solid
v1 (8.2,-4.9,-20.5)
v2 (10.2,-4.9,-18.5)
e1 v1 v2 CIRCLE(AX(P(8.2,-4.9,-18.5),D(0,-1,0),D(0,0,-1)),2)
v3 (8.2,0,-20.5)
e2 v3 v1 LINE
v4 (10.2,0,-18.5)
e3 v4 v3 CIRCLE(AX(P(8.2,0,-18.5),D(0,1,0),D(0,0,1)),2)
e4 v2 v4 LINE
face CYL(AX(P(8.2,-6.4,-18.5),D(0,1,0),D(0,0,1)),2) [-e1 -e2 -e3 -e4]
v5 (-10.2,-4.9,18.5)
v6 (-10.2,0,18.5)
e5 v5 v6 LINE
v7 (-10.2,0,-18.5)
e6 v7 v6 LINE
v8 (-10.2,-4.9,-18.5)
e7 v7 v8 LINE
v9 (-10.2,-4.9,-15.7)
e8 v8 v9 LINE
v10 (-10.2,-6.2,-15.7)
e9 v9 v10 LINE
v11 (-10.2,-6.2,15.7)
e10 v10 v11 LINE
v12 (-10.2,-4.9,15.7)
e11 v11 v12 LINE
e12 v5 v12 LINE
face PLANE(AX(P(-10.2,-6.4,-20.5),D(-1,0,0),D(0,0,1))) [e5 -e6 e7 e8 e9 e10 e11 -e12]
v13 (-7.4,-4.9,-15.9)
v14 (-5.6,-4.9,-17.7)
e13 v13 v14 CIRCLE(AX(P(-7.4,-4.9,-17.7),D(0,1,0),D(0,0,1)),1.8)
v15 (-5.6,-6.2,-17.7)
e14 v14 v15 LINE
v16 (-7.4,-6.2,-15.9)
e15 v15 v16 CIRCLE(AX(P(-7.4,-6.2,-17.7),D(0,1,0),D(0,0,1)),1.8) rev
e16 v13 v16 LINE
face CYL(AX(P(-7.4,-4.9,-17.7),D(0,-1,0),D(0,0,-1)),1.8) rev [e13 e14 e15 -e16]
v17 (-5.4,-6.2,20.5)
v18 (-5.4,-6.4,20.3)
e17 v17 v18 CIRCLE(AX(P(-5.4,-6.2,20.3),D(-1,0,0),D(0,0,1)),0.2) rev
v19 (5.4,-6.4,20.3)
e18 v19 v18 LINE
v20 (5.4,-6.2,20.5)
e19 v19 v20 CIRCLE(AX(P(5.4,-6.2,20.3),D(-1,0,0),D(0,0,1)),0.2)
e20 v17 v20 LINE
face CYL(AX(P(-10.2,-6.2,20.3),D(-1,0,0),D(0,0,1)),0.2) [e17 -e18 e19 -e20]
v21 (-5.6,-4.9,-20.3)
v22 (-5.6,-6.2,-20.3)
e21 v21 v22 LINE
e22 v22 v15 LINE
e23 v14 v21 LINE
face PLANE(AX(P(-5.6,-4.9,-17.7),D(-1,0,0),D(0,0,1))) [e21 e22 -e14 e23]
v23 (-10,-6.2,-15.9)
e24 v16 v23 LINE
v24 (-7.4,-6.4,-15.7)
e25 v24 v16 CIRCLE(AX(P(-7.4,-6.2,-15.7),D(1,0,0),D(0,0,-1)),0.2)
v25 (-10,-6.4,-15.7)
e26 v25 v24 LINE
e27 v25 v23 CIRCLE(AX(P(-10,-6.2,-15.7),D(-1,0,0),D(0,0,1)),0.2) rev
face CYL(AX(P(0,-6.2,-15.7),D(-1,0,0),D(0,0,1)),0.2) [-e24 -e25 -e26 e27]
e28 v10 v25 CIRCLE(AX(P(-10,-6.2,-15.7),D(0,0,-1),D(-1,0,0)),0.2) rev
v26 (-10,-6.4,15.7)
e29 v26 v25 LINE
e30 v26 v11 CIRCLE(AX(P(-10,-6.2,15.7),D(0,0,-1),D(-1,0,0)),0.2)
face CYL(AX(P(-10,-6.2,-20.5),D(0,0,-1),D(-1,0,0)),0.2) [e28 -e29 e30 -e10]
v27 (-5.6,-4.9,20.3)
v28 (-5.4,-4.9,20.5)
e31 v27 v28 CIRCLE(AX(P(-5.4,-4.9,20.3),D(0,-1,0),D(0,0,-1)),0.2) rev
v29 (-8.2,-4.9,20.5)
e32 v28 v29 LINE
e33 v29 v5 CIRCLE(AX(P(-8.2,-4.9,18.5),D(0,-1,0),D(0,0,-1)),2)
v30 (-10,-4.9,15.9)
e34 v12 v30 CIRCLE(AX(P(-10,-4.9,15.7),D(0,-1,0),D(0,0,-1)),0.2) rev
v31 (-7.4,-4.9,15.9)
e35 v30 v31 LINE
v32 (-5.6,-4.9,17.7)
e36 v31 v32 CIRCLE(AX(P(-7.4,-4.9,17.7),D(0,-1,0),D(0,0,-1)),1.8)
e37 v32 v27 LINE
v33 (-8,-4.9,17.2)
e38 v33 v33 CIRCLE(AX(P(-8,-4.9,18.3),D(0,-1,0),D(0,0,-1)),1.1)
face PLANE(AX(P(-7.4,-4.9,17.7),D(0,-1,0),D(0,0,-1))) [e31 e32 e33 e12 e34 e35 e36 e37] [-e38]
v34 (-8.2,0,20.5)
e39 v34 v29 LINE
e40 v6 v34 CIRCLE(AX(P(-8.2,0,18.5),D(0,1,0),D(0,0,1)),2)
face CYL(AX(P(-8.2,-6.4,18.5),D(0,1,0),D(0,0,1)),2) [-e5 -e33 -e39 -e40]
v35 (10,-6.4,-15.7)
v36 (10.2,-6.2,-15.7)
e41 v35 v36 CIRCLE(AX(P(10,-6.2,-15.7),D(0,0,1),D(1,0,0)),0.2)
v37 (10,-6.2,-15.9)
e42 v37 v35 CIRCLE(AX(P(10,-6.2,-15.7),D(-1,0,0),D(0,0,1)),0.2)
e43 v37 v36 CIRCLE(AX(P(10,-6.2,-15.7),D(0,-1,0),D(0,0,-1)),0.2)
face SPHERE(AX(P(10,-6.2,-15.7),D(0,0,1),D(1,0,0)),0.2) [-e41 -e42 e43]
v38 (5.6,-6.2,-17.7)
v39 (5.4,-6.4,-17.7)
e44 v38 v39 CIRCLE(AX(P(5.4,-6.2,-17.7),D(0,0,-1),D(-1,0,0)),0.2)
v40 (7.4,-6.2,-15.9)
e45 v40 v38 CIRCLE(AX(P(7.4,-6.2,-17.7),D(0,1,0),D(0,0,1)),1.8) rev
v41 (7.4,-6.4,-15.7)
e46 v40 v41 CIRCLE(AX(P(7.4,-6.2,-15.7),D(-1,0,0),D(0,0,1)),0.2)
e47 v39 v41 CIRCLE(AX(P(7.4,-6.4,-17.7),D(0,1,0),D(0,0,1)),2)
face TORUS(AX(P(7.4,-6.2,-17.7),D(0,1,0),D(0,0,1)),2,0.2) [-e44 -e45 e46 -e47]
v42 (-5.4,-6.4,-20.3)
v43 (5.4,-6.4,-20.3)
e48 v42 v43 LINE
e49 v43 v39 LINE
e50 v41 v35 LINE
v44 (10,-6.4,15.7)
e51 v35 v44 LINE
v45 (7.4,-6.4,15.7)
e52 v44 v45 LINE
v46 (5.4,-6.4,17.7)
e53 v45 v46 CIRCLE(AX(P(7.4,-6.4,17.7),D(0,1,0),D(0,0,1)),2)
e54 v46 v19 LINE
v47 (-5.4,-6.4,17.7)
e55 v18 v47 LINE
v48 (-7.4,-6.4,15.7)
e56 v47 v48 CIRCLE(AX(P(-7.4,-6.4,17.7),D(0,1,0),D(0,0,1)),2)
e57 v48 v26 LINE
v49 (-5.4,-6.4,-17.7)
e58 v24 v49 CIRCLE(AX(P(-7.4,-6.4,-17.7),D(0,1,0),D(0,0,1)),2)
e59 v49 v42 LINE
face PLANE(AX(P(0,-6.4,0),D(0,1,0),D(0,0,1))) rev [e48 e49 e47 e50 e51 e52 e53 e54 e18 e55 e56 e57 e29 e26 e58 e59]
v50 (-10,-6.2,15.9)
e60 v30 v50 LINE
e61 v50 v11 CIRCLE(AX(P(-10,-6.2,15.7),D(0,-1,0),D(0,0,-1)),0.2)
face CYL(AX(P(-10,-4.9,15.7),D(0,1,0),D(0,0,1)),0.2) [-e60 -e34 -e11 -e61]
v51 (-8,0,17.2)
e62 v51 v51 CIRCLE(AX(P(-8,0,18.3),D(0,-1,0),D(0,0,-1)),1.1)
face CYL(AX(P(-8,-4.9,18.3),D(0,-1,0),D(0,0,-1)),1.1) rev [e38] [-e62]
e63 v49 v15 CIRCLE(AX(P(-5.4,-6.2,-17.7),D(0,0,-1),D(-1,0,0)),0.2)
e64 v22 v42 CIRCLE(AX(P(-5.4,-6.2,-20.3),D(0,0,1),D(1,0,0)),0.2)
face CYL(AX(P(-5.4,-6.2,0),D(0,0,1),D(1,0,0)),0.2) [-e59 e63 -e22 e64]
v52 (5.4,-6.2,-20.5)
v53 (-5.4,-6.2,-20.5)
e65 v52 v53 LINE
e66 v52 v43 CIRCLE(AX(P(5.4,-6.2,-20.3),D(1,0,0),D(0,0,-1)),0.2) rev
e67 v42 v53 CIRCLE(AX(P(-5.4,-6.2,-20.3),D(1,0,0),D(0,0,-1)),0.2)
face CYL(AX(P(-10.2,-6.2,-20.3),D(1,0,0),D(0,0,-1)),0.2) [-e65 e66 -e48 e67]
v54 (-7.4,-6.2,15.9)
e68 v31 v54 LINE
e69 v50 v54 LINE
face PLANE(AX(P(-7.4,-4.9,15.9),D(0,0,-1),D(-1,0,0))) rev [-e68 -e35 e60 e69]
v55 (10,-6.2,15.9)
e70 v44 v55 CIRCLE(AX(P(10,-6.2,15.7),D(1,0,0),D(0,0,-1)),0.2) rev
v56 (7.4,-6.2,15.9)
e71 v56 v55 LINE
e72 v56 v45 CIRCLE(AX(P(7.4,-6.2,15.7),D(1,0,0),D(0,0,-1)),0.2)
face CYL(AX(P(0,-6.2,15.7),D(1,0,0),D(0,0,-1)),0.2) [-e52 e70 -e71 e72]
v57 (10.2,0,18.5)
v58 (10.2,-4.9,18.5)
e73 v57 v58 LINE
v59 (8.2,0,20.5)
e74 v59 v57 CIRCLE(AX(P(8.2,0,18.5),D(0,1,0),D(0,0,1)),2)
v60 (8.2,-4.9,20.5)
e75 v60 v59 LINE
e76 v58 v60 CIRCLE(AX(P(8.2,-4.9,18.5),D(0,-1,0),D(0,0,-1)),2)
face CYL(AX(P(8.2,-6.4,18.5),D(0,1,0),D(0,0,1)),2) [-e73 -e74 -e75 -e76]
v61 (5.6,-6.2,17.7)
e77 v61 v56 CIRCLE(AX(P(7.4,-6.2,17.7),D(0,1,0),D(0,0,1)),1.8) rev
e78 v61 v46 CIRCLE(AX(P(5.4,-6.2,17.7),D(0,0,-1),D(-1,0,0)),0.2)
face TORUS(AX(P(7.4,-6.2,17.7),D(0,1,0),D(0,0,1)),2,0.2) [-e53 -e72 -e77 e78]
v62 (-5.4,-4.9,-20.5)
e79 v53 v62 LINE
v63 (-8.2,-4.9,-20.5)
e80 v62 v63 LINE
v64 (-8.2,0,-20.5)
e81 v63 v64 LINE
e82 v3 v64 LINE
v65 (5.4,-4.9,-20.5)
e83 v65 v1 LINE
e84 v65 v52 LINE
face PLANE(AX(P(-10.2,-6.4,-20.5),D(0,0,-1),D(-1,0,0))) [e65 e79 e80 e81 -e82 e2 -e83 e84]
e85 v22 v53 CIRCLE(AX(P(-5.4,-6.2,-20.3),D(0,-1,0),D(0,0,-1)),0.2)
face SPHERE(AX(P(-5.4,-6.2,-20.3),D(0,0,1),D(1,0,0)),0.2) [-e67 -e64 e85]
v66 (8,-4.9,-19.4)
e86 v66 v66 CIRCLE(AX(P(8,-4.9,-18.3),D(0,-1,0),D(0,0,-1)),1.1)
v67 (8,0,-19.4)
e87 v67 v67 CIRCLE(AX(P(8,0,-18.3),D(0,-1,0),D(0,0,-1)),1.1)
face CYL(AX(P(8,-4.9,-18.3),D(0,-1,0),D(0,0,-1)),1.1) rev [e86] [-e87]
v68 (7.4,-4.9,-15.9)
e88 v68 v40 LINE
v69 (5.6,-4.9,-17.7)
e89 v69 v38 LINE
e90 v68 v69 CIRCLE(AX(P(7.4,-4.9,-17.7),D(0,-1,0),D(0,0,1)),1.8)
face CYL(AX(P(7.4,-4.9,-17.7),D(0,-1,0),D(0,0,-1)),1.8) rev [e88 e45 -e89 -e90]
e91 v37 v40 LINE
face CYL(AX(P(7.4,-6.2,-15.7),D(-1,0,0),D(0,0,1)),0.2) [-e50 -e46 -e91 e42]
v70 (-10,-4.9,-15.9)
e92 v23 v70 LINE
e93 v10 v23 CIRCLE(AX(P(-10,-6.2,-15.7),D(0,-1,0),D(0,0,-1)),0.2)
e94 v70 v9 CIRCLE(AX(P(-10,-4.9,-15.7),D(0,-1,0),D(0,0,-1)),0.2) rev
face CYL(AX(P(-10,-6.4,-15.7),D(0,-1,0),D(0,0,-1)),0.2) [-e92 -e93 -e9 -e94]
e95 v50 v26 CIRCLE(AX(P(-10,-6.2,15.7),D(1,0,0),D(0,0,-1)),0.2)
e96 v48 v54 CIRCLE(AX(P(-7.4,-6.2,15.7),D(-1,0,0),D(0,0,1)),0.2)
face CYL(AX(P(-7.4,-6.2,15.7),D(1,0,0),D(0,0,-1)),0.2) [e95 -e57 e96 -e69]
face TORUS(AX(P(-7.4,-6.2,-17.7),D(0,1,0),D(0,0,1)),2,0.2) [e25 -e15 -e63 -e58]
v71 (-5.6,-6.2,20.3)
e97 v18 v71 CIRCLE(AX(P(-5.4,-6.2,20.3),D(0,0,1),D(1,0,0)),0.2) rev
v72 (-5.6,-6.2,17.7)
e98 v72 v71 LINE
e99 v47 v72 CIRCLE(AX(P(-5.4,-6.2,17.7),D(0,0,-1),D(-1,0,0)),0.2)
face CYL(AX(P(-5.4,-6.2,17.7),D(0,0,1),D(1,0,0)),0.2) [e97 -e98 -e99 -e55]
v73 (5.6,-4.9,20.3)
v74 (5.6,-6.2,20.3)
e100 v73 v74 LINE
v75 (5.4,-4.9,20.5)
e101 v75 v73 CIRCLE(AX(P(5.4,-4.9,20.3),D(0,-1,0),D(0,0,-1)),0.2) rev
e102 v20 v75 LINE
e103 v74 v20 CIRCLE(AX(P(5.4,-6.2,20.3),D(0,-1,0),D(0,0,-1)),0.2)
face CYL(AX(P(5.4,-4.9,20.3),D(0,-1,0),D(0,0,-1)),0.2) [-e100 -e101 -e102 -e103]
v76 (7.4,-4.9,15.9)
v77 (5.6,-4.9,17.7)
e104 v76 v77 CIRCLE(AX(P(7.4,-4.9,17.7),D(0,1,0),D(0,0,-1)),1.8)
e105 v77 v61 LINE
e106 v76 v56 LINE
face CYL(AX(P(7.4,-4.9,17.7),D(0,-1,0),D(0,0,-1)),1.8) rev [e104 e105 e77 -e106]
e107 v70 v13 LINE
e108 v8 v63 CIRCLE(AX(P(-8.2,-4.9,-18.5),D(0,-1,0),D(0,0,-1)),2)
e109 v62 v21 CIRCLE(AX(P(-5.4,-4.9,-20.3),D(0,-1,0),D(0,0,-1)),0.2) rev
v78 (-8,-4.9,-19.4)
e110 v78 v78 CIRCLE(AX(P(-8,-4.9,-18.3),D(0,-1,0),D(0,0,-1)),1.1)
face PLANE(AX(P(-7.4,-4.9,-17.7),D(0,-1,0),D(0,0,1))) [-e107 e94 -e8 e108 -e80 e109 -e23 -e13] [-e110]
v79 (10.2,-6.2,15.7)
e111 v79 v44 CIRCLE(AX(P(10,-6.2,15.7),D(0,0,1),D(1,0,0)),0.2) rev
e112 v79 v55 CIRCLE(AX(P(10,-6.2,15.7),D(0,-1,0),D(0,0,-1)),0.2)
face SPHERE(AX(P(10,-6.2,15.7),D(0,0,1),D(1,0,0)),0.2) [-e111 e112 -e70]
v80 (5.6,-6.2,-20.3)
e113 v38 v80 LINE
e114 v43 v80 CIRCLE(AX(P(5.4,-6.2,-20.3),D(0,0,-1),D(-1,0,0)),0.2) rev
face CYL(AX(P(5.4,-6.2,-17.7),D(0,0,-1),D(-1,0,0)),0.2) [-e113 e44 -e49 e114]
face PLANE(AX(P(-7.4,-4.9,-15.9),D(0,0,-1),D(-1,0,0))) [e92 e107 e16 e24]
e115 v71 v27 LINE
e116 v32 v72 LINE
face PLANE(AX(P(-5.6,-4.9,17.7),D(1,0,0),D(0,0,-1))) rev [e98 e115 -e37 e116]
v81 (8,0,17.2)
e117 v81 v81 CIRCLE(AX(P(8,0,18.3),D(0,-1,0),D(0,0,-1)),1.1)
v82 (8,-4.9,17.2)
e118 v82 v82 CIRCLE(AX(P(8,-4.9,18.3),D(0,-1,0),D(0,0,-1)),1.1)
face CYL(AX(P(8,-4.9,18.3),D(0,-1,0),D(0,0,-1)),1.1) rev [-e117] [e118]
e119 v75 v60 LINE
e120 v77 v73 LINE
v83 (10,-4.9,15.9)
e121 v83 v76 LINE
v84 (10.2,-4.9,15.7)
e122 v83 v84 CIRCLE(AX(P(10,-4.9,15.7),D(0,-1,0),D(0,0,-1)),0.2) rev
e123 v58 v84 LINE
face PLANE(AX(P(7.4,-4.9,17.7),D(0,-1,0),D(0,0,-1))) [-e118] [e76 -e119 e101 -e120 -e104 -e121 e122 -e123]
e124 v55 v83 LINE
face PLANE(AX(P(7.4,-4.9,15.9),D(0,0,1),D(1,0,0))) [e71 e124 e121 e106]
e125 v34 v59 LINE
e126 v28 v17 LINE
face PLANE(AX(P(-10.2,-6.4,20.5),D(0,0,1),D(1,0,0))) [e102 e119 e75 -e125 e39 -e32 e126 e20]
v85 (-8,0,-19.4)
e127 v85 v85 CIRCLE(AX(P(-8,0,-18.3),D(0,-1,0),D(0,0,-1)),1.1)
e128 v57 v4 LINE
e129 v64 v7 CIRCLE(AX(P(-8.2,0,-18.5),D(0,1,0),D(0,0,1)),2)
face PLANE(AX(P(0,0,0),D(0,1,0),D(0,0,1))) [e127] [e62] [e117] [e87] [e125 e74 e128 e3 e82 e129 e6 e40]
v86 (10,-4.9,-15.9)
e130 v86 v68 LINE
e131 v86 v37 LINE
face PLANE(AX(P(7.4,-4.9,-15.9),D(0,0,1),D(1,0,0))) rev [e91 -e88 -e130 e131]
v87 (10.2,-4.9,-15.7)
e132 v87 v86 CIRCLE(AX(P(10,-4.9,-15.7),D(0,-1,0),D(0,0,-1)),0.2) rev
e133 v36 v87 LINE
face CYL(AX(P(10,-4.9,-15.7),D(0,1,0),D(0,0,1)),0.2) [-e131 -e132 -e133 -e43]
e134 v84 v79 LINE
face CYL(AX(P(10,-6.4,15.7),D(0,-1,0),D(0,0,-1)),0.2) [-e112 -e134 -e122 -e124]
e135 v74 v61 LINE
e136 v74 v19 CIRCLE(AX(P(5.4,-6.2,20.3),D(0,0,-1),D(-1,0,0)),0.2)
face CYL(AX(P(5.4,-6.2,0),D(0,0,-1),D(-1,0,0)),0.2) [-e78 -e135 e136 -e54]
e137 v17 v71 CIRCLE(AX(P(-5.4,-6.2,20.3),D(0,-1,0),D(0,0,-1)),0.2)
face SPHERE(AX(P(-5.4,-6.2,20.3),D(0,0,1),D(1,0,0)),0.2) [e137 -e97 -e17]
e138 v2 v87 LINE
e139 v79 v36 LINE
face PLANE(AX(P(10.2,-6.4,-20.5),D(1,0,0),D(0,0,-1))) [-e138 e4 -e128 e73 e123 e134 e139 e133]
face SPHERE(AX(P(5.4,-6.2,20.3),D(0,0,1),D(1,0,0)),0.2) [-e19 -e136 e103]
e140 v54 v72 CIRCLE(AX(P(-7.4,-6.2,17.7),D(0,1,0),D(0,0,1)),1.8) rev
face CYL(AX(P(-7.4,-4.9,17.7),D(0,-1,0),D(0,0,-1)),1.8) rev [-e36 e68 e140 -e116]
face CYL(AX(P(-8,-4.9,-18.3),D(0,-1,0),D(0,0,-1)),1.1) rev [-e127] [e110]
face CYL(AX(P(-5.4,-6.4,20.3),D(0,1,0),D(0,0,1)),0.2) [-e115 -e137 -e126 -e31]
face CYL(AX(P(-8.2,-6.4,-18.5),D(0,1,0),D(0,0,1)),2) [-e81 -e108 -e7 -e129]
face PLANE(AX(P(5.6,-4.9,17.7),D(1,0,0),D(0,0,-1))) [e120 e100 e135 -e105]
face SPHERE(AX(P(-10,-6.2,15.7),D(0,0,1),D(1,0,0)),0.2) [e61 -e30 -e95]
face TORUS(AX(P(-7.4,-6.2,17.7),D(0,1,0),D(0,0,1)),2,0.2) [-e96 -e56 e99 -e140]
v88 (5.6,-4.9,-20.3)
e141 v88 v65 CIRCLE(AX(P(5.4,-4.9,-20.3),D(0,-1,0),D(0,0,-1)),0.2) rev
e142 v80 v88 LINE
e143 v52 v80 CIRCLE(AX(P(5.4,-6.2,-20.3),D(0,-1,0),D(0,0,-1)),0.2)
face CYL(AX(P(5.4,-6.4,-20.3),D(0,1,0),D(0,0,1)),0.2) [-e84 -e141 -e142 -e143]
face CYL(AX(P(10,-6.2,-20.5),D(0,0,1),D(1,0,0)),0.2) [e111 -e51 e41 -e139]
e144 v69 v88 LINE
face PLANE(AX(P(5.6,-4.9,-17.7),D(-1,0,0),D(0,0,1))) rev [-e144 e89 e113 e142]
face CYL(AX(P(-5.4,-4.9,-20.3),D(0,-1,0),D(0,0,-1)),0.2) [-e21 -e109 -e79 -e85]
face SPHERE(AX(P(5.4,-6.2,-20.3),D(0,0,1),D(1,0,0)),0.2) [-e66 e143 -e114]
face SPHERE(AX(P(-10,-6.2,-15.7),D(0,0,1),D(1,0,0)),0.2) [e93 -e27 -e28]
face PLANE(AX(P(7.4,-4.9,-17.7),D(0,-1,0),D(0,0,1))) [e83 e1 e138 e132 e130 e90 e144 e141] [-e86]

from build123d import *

# Parameters (mm, degrees)
SKETCH1_W            = 20.4
SKETCH1_H            = 41
BOSS_EXTRUDE1_DEPTH  = 6.4
CUT_EXTRUDE1_DEPTH   = 1.5
M2_CLEARANCE_HOLE1_D = 2.2
MIRROR2_COPY_1_DEPTH = 1.5
MIRROR2_COPY_2_D     = 2.2
FILLET1_R            = 0.2
FILLET2_R            = 0.2
FILLET3_R            = 2


with BuildPart() as part:
    # Sketch1 → Boss-Extrude1 (new body)
    with BuildSketch(Plane(origin=(0, 0, 0), x_dir=(1, 0, 0), z_dir=(0, 1, 0))):
        Rectangle(SKETCH1_W, SKETCH1_H)
    extrude(amount=-BOSS_EXTRUDE1_DEPTH)

    # Sketch2 → Cut-Extrude1 (cut)
    with BuildSketch(Plane(origin=(0, -6.4, 0), x_dir=(-1, 0, 0), z_dir=(0, -1, 0))):
        with BuildLine():
            Line((5.6, -17.7), (5.6, -20.5))
            Line((5.6, -20.5), (10.2, -20.5))
            Line((10.2, -20.5), (10.2, -15.9))
            Line((10.2, -15.9), (7.4, -15.9))
            ThreePointArc((7.4, -15.9), (6.127207794, -16.427207794), (5.6, -17.7))
        make_face()
    cut_extrude1 = extrude(amount=-CUT_EXTRUDE1_DEPTH, mode=Mode.SUBTRACT)

    # M2 Clearance Hole1 (through all)
    with Locations(Plane(origin=(0, -4.9, 0), x_dir=(-1, 0, 0), z_dir=(0, -1, 0))):
        with Locations((8, -18.3)):
            m2_clearance_hole1 = Hole(M2_CLEARANCE_HOLE1_D / 2)

    # Mirror1: Cut-Extrude1, M2 Clearance Hole1 across plane
    add(cut_extrude1.mirror(Plane(origin=(0, 0, 0), x_dir=(0, 0, 1), z_dir=(1, 0, 0))), mode=Mode.SUBTRACT)
    add(m2_clearance_hole1.mirror(Plane(origin=(0, 0, 0), x_dir=(0, 0, 1), z_dir=(1, 0, 0))), mode=Mode.SUBTRACT)

    # Mirror2: Cut-Extrude1, M2 Clearance Hole1 across plane
    add(cut_extrude1.mirror(Plane.XY), mode=Mode.SUBTRACT)
    add(m2_clearance_hole1.mirror(Plane.XY), mode=Mode.SUBTRACT)

    # Mirror2 copy 1 sketch → Mirror2 copy 1 (cut)
    with BuildSketch(Plane.XZ.offset(6.4)):
        with BuildLine():
            Line((5.6, -17.7), (5.6, -20.5))
            Line((5.6, -20.5), (10.2, -20.5))
            Line((10.2, -20.5), (10.2, -15.9))
            Line((10.2, -15.9), (7.4, -15.9))
            ThreePointArc((7.4, -15.9), (6.127207794, -16.427207794), (5.6, -17.7))
        make_face()
    extrude(amount=-MIRROR2_COPY_1_DEPTH, mode=Mode.SUBTRACT)

    # Mirror2 copy 2 (through all)
    with Locations(Plane.XZ.offset(4.9)):
        with Locations((8, -18.3)):
            Hole(MIRROR2_COPY_2_D / 2)

    # Fillet1
    fillet1_edges = [part.edges().sort_by_distance(p)[0] for p in [
        (0, -6.4, 20.5),
        (-6.127207794, -6.4, 16.427207794),
        (-5.6, -6.4, 19.1),
        (-8.8, -6.4, 15.9),
        (10.2, -6.4, 0),
        (6.127207794, -6.4, 16.427207794),
        (5.6, -6.4, 19.1),
        (8.8, -6.4, 15.9),
        (-10.2, -6.4, 0),
        (-6.127207794, -6.4, -16.427207794),
        (-5.6, -6.4, -19.1),
        (-8.8, -6.4, -15.9),
        (0, -6.4, -20.5),
        (6.127207794, -6.4, -16.427207794),
        (5.6, -6.4, -19.1),
        (8.8, -6.4, -15.9),
    ]]
    fillet(fillet1_edges, radius=FILLET1_R)

    # Fillet2
    # the kernel refuses this fillet: 0.2 mm, written as the material it takes off along each edge
    with BuildSketch(Plane(origin=(-5.4, -6.2, 20.3), x_dir=(-1, 0, 0), z_dir=(0, 0, 1))) as fillet2_piece_1_section:
        Polygon((0, 0), (FILLET2_R, 0), (FILLET2_R, FILLET2_R), (0, FILLET2_R), align=None)
    fillet2_piece_1 = extrude(amount=FILLET2_R, mode=Mode.PRIVATE)
    fillet2_piece_1 = fillet2_piece_1 - Plane(origin=(-5.4, -6.2, 20.3), x_dir=(0.7071067811865475, 0.7071067811865475, 0), z_dir=(0, 0, 1)) * Sphere(FILLET2_R, mode=Mode.PRIVATE)
    add(fillet2_piece_1, mode=Mode.SUBTRACT)
    with BuildSketch(Plane(origin=(5.4, -6.2, 20.3), x_dir=(1, 0, 0), z_dir=(0, 0, 1))) as fillet2_piece_2_section:
        Polygon((0, 0), (FILLET2_R, 0), (FILLET2_R, -FILLET2_R), (0, -FILLET2_R), align=None)
    fillet2_piece_2 = extrude(amount=FILLET2_R, mode=Mode.PRIVATE)
    fillet2_piece_2 = fillet2_piece_2 - Plane(origin=(5.4, -6.2, 20.3), x_dir=(-0.7071067811865475, 0.7071067811865475, 0), z_dir=(0, 0, 1)) * Sphere(FILLET2_R, mode=Mode.PRIVATE)
    add(fillet2_piece_2, mode=Mode.SUBTRACT)
    with BuildSketch(Plane(origin=(-10, -6.2, 15.7), x_dir=(0, 0, 1), z_dir=(-1, 0, 0))) as fillet2_piece_3_section:
        Polygon((0, 0), (FILLET2_R, 0), (FILLET2_R, -FILLET2_R), (0, -FILLET2_R), align=None)
    fillet2_piece_3 = extrude(amount=FILLET2_R, mode=Mode.PRIVATE)
    fillet2_piece_3 = fillet2_piece_3 - Plane(origin=(-10, -6.2, 15.7), x_dir=(0, 0.7071067811865475, -0.7071067811865475), z_dir=(-1, 0, 0)) * Sphere(FILLET2_R, mode=Mode.PRIVATE)
    add(fillet2_piece_3, mode=Mode.SUBTRACT)
    with BuildSketch(Plane(origin=(-10, -6.2, -15.7), x_dir=(0, 0, -1), z_dir=(-1, 0, 0))) as fillet2_piece_4_section:
        Polygon((0, 0), (FILLET2_R, 0), (FILLET2_R, FILLET2_R), (0, FILLET2_R), align=None)
    fillet2_piece_4 = extrude(amount=FILLET2_R, mode=Mode.PRIVATE)
    fillet2_piece_4 = fillet2_piece_4 - Plane(origin=(-10, -6.2, -15.7), x_dir=(0, 0.7071067811865475, 0.7071067811865475), z_dir=(-1, 0, 0)) * Sphere(FILLET2_R, mode=Mode.PRIVATE)
    add(fillet2_piece_4, mode=Mode.SUBTRACT)
    with BuildSketch(Plane(origin=(10, -6.2, 15.7), x_dir=(0, 0, 1), z_dir=(1, 0, 0))) as fillet2_piece_5_section:
        Polygon((0, 0), (FILLET2_R, 0), (FILLET2_R, FILLET2_R), (0, FILLET2_R), align=None)
    fillet2_piece_5 = extrude(amount=FILLET2_R, mode=Mode.PRIVATE)
    fillet2_piece_5 = fillet2_piece_5 - Plane(origin=(10, -6.2, 15.7), x_dir=(0, 0.7071067811865475, -0.7071067811865475), z_dir=(1, 0, 0)) * Sphere(FILLET2_R, mode=Mode.PRIVATE)
    add(fillet2_piece_5, mode=Mode.SUBTRACT)
    with BuildSketch(Plane(origin=(10, -6.2, -15.7), x_dir=(0, 0, -1), z_dir=(1, 0, 0))) as fillet2_piece_6_section:
        Polygon((0, 0), (FILLET2_R, 0), (FILLET2_R, -FILLET2_R), (0, -FILLET2_R), align=None)
    fillet2_piece_6 = extrude(amount=FILLET2_R, mode=Mode.PRIVATE)
    fillet2_piece_6 = fillet2_piece_6 - Plane(origin=(10, -6.2, -15.7), x_dir=(0, 0.7071067811865475, 0.7071067811865475), z_dir=(1, 0, 0)) * Sphere(FILLET2_R, mode=Mode.PRIVATE)
    add(fillet2_piece_6, mode=Mode.SUBTRACT)
    with BuildSketch(Plane(origin=(-5.4, -6.2, -20.3), x_dir=(-1, 0, 0), z_dir=(0, 0, -1))) as fillet2_piece_7_section:
        Polygon((0, 0), (FILLET2_R, 0), (FILLET2_R, -FILLET2_R), (0, -FILLET2_R), align=None)
    fillet2_piece_7 = extrude(amount=FILLET2_R, mode=Mode.PRIVATE)
    fillet2_piece_7 = fillet2_piece_7 - Plane(origin=(-5.4, -6.2, -20.3), x_dir=(0.7071067811865475, 0.7071067811865475, 0), z_dir=(0, 0, -1)) * Sphere(FILLET2_R, mode=Mode.PRIVATE)
    add(fillet2_piece_7, mode=Mode.SUBTRACT)
    with BuildSketch(Plane(origin=(5.4, -6.2, -20.3), x_dir=(1, 0, 0), z_dir=(0, 0, -1))) as fillet2_piece_8_section:
        Polygon((0, 0), (FILLET2_R, 0), (FILLET2_R, FILLET2_R), (0, FILLET2_R), align=None)
    fillet2_piece_8 = extrude(amount=FILLET2_R, mode=Mode.PRIVATE)
    fillet2_piece_8 = fillet2_piece_8 - Plane(origin=(5.4, -6.2, -20.3), x_dir=(-0.7071067811865475, 0.7071067811865475, 0), z_dir=(0, 0, -1)) * Sphere(FILLET2_R, mode=Mode.PRIVATE)
    add(fillet2_piece_8, mode=Mode.SUBTRACT)
    with BuildSketch(Plane(origin=(-10.2, -6.2, 15.9), x_dir=(0, 0, -1), z_dir=(0, 1, 0)), Plane(origin=(5.6, -6.2, 20.5), x_dir=(-1, 0, 0), z_dir=(0, 1, 0)), Plane(origin=(-5.6, -6.2, -20.5), x_dir=(1, 0, 0), z_dir=(0, 1, 0)), Plane(origin=(10.2, -6.2, -15.9), x_dir=(0, 0, 1), z_dir=(0, 1, 0))) as fillet2_piece_9:
        with BuildLine():
            CenterArc((FILLET2_R, -FILLET2_R), FILLET2_R, 90, 90)
            Line((0, -FILLET2_R), (0, 0))
            Line((0, 0), (FILLET2_R, 0))
        make_face()
    extrude(amount=1.3, mode=Mode.SUBTRACT)
    with BuildSketch(Plane(origin=(-5.6, -6.2, 20.5), x_dir=(1, 0, 0), z_dir=(0, 1, 0)), Plane(origin=(10.2, -6.2, 15.9), x_dir=(0, 0, -1), z_dir=(0, 1, 0)), Plane(origin=(-10.2, -6.2, -15.9), x_dir=(0, 0, 1), z_dir=(0, 1, 0)), Plane(origin=(5.6, -6.2, -20.5), x_dir=(-1, 0, 0), z_dir=(0, 1, 0))) as fillet2_piece_10:
        with BuildLine():
            CenterArc((FILLET2_R, FILLET2_R), FILLET2_R, 180, 90)
            Line((0, FILLET2_R), (0, 0))
            Line((0, 0), (FILLET2_R, 0))
        make_face()
    extrude(amount=1.3, mode=Mode.SUBTRACT)

    # Fillet3
    fillet3_edges = [part.edges().sort_by_distance(p)[0] for p in [
        (-10.2, -2.45, 20.5),
        (10.2, -2.45, 20.5),
        (-10.2, -2.45, -20.5),
        (10.2, -2.45, -20.5),
    ]]
    fillet(fillet3_edges, radius=FILLET3_R)


solid = part.part
